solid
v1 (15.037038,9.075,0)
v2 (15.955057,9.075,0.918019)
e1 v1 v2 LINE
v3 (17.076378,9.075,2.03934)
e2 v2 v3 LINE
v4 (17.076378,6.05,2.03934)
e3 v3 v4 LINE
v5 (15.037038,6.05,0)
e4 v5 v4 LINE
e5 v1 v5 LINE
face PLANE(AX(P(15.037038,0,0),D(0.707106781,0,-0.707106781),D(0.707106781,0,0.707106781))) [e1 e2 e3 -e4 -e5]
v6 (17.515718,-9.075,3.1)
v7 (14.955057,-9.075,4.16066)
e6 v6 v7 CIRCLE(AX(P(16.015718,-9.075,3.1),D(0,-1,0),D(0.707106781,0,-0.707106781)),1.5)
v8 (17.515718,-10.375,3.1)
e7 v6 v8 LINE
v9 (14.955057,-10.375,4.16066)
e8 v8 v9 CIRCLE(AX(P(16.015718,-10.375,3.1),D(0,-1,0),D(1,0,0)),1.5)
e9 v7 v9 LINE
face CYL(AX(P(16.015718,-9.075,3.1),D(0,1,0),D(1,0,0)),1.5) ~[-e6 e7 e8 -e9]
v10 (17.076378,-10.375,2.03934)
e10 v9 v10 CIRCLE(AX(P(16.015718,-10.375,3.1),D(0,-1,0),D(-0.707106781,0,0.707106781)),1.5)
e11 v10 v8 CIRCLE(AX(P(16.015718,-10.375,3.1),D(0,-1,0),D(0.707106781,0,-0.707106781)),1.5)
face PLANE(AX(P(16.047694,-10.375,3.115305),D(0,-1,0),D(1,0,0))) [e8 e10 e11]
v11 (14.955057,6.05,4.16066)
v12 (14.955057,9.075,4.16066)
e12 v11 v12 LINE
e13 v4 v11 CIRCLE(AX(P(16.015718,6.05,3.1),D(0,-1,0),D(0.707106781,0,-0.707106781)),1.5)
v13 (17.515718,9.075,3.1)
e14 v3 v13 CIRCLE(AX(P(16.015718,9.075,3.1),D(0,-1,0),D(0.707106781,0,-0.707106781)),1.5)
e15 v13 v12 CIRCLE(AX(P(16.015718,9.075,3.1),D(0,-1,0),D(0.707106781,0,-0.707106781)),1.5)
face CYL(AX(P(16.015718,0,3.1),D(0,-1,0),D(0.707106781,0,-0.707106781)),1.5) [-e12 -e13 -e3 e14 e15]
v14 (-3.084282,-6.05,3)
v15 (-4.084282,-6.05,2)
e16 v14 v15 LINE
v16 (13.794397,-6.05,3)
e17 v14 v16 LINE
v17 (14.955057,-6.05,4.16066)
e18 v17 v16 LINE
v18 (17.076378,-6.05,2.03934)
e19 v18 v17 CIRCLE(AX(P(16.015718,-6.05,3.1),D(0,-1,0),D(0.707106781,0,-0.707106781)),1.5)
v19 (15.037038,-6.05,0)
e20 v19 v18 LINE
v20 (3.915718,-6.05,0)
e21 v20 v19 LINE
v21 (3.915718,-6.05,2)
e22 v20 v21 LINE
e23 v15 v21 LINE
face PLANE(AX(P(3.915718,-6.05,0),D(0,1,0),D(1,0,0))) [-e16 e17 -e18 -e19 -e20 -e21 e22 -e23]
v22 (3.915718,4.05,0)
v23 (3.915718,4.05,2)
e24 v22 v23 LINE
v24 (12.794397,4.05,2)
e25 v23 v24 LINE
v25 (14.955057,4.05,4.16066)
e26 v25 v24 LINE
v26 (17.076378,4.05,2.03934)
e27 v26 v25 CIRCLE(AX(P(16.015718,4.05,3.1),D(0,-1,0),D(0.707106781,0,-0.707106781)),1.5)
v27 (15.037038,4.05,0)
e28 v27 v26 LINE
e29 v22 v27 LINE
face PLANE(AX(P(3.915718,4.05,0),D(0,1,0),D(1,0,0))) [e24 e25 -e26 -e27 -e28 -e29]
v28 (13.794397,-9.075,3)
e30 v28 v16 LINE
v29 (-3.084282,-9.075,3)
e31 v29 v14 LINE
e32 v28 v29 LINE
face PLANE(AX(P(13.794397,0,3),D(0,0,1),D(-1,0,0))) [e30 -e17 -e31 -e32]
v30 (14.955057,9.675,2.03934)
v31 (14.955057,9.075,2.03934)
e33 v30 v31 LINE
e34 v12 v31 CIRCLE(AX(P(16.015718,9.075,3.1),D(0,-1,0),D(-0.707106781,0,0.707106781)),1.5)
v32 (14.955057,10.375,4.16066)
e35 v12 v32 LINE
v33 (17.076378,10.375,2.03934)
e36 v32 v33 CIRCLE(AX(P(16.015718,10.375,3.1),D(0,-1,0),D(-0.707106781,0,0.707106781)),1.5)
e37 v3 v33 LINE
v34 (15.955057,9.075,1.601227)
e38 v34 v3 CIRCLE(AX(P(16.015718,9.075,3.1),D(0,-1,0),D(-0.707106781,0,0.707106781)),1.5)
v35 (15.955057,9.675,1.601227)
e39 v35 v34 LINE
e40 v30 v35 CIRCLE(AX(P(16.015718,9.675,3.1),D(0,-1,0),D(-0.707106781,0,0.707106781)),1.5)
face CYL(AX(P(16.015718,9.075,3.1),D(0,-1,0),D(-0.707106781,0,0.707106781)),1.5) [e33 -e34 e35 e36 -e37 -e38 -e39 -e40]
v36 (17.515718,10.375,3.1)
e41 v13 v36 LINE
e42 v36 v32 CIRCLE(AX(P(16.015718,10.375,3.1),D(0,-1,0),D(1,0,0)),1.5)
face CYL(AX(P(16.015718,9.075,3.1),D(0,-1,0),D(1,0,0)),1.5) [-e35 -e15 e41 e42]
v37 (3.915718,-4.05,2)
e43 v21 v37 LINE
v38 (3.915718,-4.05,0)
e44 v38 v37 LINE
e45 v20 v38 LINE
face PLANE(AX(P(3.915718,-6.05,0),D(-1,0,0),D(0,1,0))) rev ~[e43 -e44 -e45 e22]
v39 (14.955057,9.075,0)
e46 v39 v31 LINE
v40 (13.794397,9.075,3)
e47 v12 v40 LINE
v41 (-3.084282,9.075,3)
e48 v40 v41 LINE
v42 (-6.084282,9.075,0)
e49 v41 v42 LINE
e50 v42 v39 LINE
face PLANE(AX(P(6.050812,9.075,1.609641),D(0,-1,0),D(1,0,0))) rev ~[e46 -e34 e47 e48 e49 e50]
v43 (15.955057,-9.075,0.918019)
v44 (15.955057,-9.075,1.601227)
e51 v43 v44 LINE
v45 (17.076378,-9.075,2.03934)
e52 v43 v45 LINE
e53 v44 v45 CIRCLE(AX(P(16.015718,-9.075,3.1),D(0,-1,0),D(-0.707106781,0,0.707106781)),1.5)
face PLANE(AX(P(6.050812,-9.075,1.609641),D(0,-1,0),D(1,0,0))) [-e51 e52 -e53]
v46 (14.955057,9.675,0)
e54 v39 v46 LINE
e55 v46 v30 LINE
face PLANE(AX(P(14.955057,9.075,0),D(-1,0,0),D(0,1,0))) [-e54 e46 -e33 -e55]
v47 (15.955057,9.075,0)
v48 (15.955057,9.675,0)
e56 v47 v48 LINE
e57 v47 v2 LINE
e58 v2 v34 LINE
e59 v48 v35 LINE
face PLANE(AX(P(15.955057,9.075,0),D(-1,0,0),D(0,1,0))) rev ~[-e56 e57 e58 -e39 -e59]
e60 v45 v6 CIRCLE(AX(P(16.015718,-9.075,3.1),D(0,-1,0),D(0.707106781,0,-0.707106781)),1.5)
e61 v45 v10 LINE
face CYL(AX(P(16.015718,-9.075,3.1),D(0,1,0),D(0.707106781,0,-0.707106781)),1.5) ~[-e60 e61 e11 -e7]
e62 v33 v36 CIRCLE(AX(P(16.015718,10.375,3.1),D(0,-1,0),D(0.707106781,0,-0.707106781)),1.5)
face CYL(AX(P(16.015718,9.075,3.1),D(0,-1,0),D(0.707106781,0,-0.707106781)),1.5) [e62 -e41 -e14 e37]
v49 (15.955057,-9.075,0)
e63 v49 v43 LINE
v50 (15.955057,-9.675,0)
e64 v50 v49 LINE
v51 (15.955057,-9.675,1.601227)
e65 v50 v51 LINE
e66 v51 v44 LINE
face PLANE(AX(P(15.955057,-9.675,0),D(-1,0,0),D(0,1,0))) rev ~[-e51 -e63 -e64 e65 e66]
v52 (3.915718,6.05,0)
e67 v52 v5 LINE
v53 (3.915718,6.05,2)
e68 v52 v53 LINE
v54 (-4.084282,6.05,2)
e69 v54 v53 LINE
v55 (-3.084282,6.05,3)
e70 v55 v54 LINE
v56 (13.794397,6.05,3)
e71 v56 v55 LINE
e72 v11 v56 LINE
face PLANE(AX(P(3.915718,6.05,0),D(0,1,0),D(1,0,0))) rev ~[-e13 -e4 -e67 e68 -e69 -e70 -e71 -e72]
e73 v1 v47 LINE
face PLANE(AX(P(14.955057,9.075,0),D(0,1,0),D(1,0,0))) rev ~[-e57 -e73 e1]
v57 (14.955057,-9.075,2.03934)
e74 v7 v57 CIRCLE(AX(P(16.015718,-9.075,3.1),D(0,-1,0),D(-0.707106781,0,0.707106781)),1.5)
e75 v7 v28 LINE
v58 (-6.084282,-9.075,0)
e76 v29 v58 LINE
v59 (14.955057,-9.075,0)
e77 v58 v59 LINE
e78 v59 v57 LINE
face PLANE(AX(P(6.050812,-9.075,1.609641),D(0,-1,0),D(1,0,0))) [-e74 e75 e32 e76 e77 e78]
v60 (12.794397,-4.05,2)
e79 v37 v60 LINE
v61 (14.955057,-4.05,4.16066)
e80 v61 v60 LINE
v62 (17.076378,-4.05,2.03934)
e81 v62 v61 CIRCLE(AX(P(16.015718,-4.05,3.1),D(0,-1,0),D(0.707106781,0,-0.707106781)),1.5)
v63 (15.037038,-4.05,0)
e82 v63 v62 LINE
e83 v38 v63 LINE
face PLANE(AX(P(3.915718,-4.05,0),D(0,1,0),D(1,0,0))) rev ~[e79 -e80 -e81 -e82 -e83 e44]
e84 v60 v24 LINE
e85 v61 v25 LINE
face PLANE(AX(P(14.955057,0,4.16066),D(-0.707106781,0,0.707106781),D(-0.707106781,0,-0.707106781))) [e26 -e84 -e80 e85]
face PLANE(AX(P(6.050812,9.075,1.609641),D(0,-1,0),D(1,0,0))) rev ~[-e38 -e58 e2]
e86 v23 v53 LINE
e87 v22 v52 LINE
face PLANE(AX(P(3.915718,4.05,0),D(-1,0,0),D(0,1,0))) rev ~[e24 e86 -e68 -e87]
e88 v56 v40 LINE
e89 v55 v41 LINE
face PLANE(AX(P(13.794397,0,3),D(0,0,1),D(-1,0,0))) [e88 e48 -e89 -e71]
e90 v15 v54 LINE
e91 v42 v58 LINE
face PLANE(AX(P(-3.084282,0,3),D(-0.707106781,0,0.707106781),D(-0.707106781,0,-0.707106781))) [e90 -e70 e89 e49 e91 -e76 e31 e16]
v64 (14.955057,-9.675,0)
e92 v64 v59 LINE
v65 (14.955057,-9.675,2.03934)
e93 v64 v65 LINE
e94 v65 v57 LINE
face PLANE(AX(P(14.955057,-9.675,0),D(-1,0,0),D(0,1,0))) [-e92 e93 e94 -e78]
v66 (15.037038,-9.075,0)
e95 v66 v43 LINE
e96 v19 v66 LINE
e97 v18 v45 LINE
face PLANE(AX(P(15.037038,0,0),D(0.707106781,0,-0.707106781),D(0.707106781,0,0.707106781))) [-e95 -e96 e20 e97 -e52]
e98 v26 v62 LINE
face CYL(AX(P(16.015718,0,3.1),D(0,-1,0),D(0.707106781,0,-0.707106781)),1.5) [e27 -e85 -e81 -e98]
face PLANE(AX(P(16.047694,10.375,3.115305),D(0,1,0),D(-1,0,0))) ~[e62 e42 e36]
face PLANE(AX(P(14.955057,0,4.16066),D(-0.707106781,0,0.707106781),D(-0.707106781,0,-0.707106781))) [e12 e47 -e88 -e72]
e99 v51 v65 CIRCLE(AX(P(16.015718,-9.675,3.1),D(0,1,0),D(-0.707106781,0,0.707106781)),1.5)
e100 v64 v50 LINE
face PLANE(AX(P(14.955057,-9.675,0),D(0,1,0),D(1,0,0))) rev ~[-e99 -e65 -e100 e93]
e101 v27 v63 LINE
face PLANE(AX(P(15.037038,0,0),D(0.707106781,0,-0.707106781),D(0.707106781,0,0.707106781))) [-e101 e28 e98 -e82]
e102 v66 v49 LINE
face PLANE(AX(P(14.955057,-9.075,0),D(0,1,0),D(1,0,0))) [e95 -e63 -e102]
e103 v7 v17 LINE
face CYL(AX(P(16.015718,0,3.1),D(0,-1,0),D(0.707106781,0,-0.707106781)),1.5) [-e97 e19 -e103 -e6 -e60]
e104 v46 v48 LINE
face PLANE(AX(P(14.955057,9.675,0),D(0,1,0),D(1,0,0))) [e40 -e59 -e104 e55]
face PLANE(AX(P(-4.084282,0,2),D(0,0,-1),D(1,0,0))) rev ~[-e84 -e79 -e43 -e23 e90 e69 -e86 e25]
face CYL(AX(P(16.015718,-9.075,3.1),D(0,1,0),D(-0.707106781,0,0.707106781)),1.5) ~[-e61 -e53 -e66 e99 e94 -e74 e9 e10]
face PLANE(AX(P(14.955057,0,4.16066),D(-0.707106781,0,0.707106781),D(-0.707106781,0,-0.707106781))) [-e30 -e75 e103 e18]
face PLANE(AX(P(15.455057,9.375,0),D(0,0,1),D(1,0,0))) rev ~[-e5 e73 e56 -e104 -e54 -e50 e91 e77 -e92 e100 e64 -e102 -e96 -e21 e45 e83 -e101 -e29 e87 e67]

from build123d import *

# Parameters (mm, degrees)
F1_DEPTH  = 9.075
F3_DEPTH  = 1.3
F6_DEPTH  = 6.05
F7_W      = 15
F7_H      = 2
F8_DEPTH  = 4.601
F9_W      = 1
F9_H      = 0.6
F10_DEPTH = 3


with BuildPart() as f1:
    # F0 (on Front) → F1 (new body, symmetric)
    with BuildSketch(Plane.XZ):
        with BuildLine():
            Line((-3.0842823463, 3), (-6.0842823463, 0))
            Line((-6.0842823463, 0), (15.0370379973, 0))
            Line((15.0370379973, 0), (17.0763778255, 2.0393398282))
            ThreePointArc((17.0763778255, 2.0393398282), (17.0763778255, 4.1606601718), (14.9550574819, 4.1606601718))
            Line((14.9550574819, 4.1606601718), (13.7943973101, 3))
            Line((13.7943973101, 3), (-3.0842823463, 3))
        make_face()
    extrude(amount=F1_DEPTH, both=True)

    # F2 (on face) → F3 (join)
    with BuildSketch(Plane.XZ.offset(9.075)):
        with BuildLine():
            ThreePointArc((17.0763778255, 2.0393398282), (17.4015369525, 2.5259748515), (17.5157176537, 3.1))
            ThreePointArc((17.5157176537, 3.1), (16.5897428022, 4.4858192988), (14.9550574819, 4.1606601718))
            ThreePointArc((14.9550574819, 4.1606601718), (14.9550574819, 2.0393398282), (17.0763778255, 2.0393398282))
        make_face()
    extrude(amount=F3_DEPTH)

    # F4: F1 across plane


with BuildPart() as f1_1:
    add(f1.part)
    add(f1.part.mirror(Plane.XZ))

    # F5 (on Front) → F6 (cut, symmetric)
    with BuildSketch(Plane.XZ):
        Polygon((12.7943973101, 2), (13.7943973101, 3), (-3.0842823463, 3), (-4.0842823463, 2), align=None)
    extrude(amount=F6_DEPTH, both=True, mode=Mode.SUBTRACT)

    # F7 (on Top) → F8 (cut, through all)
    with BuildSketch(Plane.XY):
        with Locations((11.4157176537, -5.05)):
            Rectangle(F7_W, F7_H)
        with Locations((11.4157176537, 5.05)):
            Rectangle(F7_W, F7_H)
    extrude(amount=F8_DEPTH, mode=Mode.SUBTRACT)

    # F9 (on Top) → F10 (join)
    with BuildSketch(Plane.XY):
        with Locations((15.4550574819, 9.375)):
            Rectangle(F9_W, F9_H)
        with Locations((15.4550574819, -9.375)):
            Rectangle(F9_W, F9_H)
    extrude(amount=F10_DEPTH)


solid = f1_1.part
